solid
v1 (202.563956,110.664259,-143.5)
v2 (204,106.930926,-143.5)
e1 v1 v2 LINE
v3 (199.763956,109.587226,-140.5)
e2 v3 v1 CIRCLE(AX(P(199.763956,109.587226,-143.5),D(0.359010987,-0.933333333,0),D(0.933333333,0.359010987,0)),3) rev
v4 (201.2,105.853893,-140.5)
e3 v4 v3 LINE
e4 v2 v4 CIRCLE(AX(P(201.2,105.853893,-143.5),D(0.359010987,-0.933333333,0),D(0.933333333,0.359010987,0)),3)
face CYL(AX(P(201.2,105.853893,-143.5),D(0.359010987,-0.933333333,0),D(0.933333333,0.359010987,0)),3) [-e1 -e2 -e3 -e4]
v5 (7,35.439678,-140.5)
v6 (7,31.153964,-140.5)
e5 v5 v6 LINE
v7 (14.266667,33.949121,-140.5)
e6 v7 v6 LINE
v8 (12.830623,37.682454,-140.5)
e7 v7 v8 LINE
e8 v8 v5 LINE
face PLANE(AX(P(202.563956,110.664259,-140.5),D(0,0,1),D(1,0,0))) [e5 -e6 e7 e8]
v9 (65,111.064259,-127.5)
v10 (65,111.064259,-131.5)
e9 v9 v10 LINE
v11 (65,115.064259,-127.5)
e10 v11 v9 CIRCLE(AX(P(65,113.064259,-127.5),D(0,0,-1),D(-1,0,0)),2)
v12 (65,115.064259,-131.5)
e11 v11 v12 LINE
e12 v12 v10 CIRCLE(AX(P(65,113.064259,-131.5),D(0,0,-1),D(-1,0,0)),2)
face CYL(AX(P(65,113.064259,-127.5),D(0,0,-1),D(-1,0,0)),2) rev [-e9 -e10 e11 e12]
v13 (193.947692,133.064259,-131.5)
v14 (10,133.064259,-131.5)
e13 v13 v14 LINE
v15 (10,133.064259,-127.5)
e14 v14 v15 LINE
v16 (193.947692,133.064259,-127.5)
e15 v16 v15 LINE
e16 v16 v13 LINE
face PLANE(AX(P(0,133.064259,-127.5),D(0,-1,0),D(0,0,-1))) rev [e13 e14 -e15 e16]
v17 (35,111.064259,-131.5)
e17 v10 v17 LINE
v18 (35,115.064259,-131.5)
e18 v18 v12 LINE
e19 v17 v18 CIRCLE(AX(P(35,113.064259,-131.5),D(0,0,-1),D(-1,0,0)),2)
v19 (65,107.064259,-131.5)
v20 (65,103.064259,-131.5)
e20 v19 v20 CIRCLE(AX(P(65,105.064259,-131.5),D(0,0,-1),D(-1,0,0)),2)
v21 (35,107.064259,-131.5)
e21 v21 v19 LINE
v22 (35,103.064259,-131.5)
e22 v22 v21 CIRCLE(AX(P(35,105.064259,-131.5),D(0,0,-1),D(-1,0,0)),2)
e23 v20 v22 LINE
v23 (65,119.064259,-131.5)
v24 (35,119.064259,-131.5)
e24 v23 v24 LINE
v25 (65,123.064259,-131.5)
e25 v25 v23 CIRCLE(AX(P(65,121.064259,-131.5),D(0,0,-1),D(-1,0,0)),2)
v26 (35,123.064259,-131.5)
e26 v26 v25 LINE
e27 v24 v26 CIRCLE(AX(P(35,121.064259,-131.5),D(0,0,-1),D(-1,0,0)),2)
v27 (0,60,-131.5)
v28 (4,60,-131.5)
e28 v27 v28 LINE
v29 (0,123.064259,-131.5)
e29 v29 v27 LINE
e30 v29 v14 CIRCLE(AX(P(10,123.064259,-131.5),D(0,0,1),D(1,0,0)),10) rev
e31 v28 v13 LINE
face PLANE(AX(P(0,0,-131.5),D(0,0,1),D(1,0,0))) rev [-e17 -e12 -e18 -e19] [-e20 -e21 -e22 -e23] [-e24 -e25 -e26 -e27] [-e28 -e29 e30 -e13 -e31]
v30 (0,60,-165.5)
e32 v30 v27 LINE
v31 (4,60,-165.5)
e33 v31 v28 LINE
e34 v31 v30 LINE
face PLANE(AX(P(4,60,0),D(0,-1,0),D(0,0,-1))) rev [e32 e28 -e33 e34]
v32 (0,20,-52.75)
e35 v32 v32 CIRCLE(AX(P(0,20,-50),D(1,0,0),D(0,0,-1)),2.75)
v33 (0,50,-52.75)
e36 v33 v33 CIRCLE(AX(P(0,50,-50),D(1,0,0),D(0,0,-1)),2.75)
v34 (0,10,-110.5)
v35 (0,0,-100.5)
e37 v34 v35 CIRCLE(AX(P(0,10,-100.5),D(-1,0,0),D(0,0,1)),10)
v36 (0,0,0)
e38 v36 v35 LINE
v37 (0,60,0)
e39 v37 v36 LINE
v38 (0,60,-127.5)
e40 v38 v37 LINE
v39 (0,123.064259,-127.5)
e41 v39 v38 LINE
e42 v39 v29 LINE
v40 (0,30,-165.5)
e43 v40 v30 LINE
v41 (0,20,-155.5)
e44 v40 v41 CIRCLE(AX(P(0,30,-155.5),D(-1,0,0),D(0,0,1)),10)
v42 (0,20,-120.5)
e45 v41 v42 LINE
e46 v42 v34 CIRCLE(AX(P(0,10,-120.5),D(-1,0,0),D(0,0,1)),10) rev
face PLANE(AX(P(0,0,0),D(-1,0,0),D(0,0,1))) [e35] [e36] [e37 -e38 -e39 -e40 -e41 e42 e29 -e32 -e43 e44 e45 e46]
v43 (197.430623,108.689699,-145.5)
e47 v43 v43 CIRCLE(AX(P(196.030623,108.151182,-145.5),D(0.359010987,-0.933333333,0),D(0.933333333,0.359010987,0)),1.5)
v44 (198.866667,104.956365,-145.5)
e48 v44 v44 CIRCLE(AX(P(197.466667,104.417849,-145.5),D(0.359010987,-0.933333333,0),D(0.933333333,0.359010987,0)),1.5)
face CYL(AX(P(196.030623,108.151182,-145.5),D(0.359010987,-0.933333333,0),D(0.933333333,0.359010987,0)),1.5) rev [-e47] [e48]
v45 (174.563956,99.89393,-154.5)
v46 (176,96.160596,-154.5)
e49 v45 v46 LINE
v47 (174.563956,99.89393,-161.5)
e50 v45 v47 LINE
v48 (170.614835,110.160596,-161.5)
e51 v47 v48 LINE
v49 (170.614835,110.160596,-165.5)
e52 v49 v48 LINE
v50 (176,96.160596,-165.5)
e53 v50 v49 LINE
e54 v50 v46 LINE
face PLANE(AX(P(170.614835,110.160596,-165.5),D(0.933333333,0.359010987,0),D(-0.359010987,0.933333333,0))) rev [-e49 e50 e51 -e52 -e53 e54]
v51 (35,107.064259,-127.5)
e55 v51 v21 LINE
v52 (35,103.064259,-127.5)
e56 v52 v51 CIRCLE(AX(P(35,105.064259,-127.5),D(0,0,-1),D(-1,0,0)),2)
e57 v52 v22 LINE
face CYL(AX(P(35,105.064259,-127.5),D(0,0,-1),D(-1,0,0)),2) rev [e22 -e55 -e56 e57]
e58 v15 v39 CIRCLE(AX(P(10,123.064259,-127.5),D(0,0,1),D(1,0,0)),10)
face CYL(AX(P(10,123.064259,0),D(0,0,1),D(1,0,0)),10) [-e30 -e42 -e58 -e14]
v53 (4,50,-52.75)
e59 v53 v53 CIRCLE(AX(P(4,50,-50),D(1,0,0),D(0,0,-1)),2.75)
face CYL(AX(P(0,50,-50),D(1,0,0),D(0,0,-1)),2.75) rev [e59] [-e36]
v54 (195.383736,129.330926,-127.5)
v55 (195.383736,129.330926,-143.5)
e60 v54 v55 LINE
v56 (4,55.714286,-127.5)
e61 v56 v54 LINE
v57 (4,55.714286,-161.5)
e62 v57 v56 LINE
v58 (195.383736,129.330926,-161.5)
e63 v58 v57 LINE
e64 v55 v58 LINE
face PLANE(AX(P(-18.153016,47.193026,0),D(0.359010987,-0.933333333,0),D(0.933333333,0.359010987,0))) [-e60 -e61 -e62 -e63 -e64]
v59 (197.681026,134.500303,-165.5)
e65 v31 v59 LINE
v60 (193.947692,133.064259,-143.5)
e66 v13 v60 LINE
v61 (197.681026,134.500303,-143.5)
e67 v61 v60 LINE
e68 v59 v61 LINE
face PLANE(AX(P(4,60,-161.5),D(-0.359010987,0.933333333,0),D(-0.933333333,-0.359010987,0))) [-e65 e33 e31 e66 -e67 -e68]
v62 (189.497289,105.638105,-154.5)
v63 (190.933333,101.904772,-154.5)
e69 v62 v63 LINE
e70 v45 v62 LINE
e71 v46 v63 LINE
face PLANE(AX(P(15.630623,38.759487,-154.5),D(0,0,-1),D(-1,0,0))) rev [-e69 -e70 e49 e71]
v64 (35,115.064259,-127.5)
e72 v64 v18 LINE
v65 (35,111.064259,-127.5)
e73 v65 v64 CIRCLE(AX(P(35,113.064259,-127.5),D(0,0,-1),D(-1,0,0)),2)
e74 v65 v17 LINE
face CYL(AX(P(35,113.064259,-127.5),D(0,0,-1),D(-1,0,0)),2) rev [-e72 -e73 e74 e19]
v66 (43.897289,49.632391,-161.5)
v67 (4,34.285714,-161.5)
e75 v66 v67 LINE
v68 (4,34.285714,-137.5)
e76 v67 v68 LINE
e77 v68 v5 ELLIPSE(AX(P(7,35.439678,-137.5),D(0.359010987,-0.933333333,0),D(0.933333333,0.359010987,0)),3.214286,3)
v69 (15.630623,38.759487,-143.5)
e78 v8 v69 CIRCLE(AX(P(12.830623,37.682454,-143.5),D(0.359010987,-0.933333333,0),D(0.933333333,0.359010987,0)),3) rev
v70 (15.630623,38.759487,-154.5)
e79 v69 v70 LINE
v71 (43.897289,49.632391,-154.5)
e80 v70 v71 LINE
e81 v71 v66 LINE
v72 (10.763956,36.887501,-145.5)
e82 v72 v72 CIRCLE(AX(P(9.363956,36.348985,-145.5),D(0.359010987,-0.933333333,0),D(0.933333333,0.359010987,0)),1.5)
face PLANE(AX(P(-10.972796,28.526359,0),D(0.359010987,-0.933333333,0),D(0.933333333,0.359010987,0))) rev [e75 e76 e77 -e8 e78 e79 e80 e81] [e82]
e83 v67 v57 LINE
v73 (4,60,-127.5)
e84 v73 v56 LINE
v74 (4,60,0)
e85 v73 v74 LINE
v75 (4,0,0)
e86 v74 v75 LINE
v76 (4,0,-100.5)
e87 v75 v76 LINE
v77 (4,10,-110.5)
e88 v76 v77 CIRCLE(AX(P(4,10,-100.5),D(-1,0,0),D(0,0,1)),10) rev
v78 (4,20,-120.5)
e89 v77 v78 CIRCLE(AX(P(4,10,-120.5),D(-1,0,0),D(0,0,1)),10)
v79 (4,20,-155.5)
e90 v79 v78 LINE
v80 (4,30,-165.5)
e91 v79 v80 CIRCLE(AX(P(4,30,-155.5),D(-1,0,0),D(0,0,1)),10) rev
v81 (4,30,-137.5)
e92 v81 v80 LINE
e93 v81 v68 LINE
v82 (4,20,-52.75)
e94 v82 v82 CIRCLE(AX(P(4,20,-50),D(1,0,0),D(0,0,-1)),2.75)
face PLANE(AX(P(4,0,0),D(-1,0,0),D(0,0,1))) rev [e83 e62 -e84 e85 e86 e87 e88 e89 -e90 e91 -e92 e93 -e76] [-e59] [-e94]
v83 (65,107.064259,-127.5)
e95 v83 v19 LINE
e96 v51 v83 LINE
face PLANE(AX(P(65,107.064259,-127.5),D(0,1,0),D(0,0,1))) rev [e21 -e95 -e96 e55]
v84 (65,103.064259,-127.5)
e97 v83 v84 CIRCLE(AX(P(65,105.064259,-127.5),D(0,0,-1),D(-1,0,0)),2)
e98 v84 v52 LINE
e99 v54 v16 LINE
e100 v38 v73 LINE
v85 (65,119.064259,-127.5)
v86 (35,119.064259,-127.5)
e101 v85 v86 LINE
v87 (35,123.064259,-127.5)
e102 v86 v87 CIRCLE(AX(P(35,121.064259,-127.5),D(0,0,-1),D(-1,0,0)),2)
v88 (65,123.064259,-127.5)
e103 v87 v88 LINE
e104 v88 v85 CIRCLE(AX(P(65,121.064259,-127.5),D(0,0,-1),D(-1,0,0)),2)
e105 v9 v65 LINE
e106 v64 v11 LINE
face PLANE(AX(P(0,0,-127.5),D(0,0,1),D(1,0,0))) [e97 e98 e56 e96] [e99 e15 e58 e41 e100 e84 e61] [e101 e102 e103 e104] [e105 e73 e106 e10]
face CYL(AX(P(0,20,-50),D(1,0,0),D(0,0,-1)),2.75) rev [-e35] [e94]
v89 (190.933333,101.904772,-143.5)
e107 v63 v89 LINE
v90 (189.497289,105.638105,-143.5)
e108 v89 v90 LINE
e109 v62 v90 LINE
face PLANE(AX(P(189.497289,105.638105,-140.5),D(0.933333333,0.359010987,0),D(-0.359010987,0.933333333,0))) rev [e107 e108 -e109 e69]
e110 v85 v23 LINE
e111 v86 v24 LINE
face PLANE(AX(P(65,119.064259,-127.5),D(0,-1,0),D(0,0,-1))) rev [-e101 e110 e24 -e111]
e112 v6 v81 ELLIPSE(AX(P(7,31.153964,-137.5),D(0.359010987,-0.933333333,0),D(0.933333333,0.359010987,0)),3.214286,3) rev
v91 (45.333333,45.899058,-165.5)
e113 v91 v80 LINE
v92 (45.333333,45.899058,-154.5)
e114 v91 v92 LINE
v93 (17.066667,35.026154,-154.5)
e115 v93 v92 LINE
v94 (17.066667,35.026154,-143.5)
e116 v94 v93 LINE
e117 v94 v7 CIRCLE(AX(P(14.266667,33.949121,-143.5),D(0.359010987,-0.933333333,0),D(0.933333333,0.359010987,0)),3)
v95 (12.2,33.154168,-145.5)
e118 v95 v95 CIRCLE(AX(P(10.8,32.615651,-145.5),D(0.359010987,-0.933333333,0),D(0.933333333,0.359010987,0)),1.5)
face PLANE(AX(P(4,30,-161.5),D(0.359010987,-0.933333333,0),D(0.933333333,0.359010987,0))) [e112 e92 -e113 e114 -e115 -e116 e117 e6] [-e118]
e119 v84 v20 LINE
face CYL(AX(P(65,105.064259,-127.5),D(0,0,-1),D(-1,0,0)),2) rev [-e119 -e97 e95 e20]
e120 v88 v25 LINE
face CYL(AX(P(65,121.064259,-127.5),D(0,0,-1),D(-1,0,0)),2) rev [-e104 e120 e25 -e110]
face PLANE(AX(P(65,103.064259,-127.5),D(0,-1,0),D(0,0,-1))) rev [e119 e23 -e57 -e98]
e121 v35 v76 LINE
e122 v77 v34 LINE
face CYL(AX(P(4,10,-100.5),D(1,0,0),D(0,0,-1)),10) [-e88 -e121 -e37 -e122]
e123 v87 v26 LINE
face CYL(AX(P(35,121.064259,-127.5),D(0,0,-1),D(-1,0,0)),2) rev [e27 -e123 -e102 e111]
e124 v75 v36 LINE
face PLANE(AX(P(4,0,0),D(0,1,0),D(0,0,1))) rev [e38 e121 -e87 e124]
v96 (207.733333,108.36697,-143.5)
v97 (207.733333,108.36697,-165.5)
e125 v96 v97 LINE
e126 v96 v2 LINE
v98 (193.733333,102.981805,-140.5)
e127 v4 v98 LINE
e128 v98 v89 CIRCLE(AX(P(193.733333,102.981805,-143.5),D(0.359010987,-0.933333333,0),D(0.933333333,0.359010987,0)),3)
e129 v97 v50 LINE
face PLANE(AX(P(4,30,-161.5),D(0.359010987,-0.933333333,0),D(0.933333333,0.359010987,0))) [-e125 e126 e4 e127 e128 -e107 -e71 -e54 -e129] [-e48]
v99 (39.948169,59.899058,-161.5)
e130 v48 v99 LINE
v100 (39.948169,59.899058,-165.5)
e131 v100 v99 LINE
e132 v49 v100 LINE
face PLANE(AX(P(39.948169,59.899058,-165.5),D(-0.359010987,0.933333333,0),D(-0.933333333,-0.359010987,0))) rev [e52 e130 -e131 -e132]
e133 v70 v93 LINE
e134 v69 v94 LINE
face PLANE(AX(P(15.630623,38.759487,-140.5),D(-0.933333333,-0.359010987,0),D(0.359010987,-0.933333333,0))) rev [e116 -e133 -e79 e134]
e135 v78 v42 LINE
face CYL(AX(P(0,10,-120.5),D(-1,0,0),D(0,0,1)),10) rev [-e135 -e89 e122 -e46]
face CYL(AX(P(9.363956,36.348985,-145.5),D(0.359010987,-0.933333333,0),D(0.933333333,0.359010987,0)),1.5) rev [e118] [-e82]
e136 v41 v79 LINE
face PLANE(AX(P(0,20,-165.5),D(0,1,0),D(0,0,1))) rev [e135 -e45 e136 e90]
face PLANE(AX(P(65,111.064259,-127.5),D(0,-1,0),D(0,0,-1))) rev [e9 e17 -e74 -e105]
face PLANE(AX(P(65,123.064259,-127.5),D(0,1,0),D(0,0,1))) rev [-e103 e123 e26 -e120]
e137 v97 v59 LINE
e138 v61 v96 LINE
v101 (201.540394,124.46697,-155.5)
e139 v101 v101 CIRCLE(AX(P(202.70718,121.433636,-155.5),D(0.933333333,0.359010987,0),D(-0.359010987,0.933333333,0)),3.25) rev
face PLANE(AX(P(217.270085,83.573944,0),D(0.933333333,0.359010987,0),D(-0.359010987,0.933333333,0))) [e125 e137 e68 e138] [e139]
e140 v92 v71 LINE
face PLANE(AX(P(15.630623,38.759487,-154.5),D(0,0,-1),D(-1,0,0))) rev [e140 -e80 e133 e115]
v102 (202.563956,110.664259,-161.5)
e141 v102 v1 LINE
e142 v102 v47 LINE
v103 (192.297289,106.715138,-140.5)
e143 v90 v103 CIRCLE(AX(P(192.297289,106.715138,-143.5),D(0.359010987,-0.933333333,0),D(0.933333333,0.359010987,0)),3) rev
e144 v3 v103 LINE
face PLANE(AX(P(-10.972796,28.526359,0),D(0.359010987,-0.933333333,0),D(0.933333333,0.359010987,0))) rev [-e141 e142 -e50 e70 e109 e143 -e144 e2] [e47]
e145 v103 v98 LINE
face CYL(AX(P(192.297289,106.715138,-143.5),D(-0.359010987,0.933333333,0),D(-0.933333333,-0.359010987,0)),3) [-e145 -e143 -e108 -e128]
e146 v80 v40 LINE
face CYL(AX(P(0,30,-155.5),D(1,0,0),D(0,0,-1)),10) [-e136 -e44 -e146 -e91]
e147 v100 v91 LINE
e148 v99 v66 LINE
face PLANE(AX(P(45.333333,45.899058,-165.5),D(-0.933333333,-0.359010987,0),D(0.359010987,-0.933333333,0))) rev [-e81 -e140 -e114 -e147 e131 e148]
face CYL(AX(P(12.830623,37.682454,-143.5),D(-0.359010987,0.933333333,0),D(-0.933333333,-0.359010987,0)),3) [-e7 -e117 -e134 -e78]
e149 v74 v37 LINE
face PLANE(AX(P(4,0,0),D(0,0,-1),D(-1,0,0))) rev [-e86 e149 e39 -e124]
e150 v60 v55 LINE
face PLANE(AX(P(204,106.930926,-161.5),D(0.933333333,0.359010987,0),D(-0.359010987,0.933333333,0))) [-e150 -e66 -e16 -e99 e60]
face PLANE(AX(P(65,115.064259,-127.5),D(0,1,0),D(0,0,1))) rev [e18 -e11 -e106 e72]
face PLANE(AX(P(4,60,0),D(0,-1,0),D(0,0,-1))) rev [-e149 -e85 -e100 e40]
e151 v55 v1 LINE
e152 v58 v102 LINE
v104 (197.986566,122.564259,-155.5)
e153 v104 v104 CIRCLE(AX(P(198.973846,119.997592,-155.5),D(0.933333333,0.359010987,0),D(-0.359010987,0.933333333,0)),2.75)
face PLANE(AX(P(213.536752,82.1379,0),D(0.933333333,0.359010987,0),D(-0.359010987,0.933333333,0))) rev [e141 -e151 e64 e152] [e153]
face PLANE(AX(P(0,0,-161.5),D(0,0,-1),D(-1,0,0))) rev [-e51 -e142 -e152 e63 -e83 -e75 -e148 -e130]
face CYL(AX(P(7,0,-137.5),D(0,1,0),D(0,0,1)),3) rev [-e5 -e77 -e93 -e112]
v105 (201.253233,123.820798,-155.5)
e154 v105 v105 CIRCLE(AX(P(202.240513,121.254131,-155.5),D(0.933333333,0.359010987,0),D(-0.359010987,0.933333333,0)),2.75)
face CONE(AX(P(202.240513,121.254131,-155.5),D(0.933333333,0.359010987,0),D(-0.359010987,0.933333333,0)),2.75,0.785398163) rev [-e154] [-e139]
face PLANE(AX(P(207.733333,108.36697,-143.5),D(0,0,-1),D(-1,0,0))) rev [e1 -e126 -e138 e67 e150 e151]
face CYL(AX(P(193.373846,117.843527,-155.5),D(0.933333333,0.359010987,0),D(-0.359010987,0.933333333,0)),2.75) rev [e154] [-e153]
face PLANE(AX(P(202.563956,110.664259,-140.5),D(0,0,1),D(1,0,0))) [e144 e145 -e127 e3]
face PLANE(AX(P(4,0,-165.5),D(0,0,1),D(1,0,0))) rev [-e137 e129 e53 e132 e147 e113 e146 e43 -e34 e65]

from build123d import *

# Parameters (mm, degrees)
SKETCH_1_W          = 165.5
SKETCH_1_H          = 60
EXTRUDE_1_DEPTH     = 4
EXTRUDE_2_DEPTH     = 4
SKETCH_3_W          = 214.285714285
SKETCH_3_H          = 25
EXTRUDE_5_DEPTH     = 4
SKETCH_4_R          = 2.75
CUT_EXTRUDE_1_DEPTH = 4
SKETCH_5_W          = 55
SKETCH_5_H          = 20
CUT_EXTRUDE_2_DEPTH = 4
FILLET_1_R          = 10
SKETCH_6_W          = 186.285714285
SKETCH_6_H          = 14
CUT_EXTRUDE_3_DEPTH = 4
SKETCH_7_R          = 1.5
CUT_EXTRUDE_4_DEPTH = 4
FILLET_2_R          = 3
CUT_EXTRUDE_5_DEPTH = 293.240221501
CUT_EXTRUDE_6_DEPTH = 10
SKETCH_11_W         = 207.248718004
SKETCH_11_H         = 34
EXTRUDE_6_DEPTH     = 4
EXTRUDE_7_DEPTH     = 4
FILLET_3_R          = 10
CUT_EXTRUDE_7_DEPTH = 4
SKETCH_15_W         = 22
SKETCH_15_H         = 28
EXTRUDE_8_DEPTH     = 4
SKETCH_16_R         = 2.75
CUT_EXTRUDE_8_DEPTH = 10
CHAMFER_1_SIZE      = 0.5


with BuildPart() as part:
    # 草图1 → 凸台-拉伸1 (new body)
    with BuildSketch(Plane(origin=(0, 0, 0), x_dir=(0, 0, -1), z_dir=(1, 0, 0))):
        with Locations((82.75, 30)):
            Rectangle(SKETCH_1_W, SKETCH_1_H)
    extrude(amount=EXTRUDE_1_DEPTH)

    # 草图2 → 凸台-拉伸2 (add)
    with BuildSketch(Plane(origin=(0, 0, -165.5), x_dir=(-1, 0, 0), z_dir=(0, 0, -1))):
        Polygon((-4, 30), (-204, 106.930925816), (-193.94769236, 133.06425915), (-4, 60), align=None)
    extrude(amount=-EXTRUDE_2_DEPTH)

    # 草图3 → 凸台-拉伸5 (add)
    with BuildSketch(Plane(origin=(-9.536752084, 24.793025648, 0), x_dir=(0.9333333333333335, 0.3590109871422999, 0), z_dir=(0.3590109871422999, -0.9333333333333335, 0))):
        with Locations((121.646520091, -153)):
            Rectangle(SKETCH_3_W, SKETCH_3_H)
    extrude(amount=-EXTRUDE_5_DEPTH)

    # 草图4 → 切除-拉伸1 (cut)
    with BuildSketch(Plane(origin=(4, 0, 0), x_dir=(0, 0, -1), z_dir=(1, 0, 0))):
        with Locations((50, 50)):
            Circle(SKETCH_4_R)
        with Locations((50, 20)):
            Circle(SKETCH_4_R)
    extrude(amount=-CUT_EXTRUDE_1_DEPTH, mode=Mode.SUBTRACT)

    # 草图5 → 切除-拉伸2 (cut)
    with BuildSketch(Plane(origin=(4, 0, 0), x_dir=(0, 0, -1), z_dir=(1, 0, 0))):
        with Locations((138, 10)):
            Rectangle(SKETCH_5_W, SKETCH_5_H)
    extrude(amount=-CUT_EXTRUDE_2_DEPTH, mode=Mode.SUBTRACT)

    # 圆角1
    fillet_1_edges = [part.edges().sort_by_distance(p)[0] for p in [
        (2, 20, -165.5),
        (2, 20, -110.5),
        (2, 0, -110.5),
    ]]
    fillet(fillet_1_edges, radius=FILLET_1_R - 0.0001)  # a hair under: the kernel refuses the full size

    # 草图6 → 切除-拉伸3 (cut)
    with BuildSketch(Plane(origin=(-9.536752084, 24.793025648, 0), x_dir=(0.9333333333333335, 0.35901098714229984, 0), z_dir=(0.35901098714229984, -0.9333333333333335, 0))):
        with Locations((121.646520091, -147.5)):
            Rectangle(SKETCH_6_W, SKETCH_6_H)
    extrude(amount=-CUT_EXTRUDE_3_DEPTH, mode=Mode.SUBTRACT)

    # 草图7 → 切除-拉伸4 (cut)
    with BuildSketch(Plane(origin=(-9.536752084, 24.793025648, 0), x_dir=(0.9333333333333335, 0.35901098714229984, 0), z_dir=(0.35901098714229984, -0.9333333333333335, 0))):
        with Locations((221.789377233, -145.5)):
            Circle(SKETCH_7_R)
        with Locations((21.789377233, -145.5)):
            Circle(SKETCH_7_R)
    extrude(amount=-CUT_EXTRUDE_4_DEPTH, mode=Mode.SUBTRACT)

    # 圆角2
    fillet_2_edges = [part.edges().sort_by_distance(p)[0] for p in [
        (4, 32.142857143, -140.5),
        (203.281978026, 108.797592483, -140.5),
        (16.348644692, 36.892820487, -140.5),
        (190.215311359, 103.771438663, -140.5),
    ]]
    fillet(fillet_2_edges, radius=FILLET_2_R)

    # 草图8 → 切除-拉伸5 (cut, through all)
    with BuildSketch(Plane.XY.offset(-161.5)):
        Polygon((45.333333333, 45.899058002), (39.948168526, 59.899058002), (170.614835193, 110.160596202), (176, 96.160596202), align=None)
    extrude(amount=-CUT_EXTRUDE_5_DEPTH, mode=Mode.SUBTRACT)

    # 草图9 → 切除-拉伸6 (cut)
    with BuildSketch(Plane(origin=(0, 0, -161.5), x_dir=(-1, 0, 0), z_dir=(0, 0, -1))):
        Polygon((-43.897289385, 49.632391335), (-174.563956051, 99.893929535), (-176, 96.160596202), (-45.333333333, 45.899058002), align=None)
    extrude(amount=-CUT_EXTRUDE_6_DEPTH, mode=Mode.SUBTRACT)

    # 草图11 → 凸台-拉伸6 (add)
    with BuildSketch(Plane(origin=(-19.589059724, 50.926358981, 0), x_dir=(0.9333333333333335, 0.3590109871422999, 0), z_dir=(-0.3590109871422999, 0.9333333333333335, 0))):
        with Locations((125.165018231, 148.5)):
            Rectangle(SKETCH_11_W, SKETCH_11_H)
    extrude(amount=-EXTRUDE_6_DEPTH)

    # 草图12 → 凸台-拉伸7 (add)
    with BuildSketch(Plane.XY.offset(-131.5)):
        Polygon((4, 55.714285714), (4, 60), (0, 60), (0, 133.06425915), (193.94769236, 133.06425915), (195.383736309, 129.330925816), align=None)
    extrude(amount=EXTRUDE_7_DEPTH)

    # 圆角3
    fillet_3_edges = [part.edges().sort_by_distance(p)[0] for p in [
        (0, 133.06425915, -129.5),
    ]]
    fillet(fillet_3_edges, radius=FILLET_3_R)

    # 草图14 → 切除-拉伸7 (cut)
    with BuildSketch(Plane(origin=(0, 0, -131.5), x_dir=(-1, 0, 0), z_dir=(0, 0, -1))):
        with BuildLine():
            Line((-65, 123.06425915), (-35, 123.06425915))
            ThreePointArc((-35, 123.06425915), (-33, 121.06425915), (-35, 119.06425915))
            Line((-35, 119.06425915), (-65, 119.06425915))
            ThreePointArc((-65, 119.06425915), (-67, 121.06425915), (-65, 123.06425915))
        make_face()
        with BuildLine():
            Line((-65, 115.06425915), (-35, 115.06425915))
            ThreePointArc((-35, 115.06425915), (-33, 113.06425915), (-35, 111.06425915))
            Line((-35, 111.06425915), (-65, 111.06425915))
            ThreePointArc((-65, 111.06425915), (-67, 113.06425915), (-65, 115.06425915))
        make_face()
        with BuildLine():
            Line((-65, 107.06425915), (-35, 107.06425915))
            ThreePointArc((-35, 107.06425915), (-33, 105.06425915), (-35, 103.06425915))
            Line((-35, 103.06425915), (-65, 103.06425915))
            ThreePointArc((-65, 103.06425915), (-67, 105.06425915), (-65, 107.06425915))
        make_face()
    extrude(amount=-CUT_EXTRUDE_7_DEPTH, mode=Mode.SUBTRACT)

    # 草图15 → 凸台-拉伸8 (add)
    with BuildSketch(Plane(origin=(213.536752084, 82.137900168, 0), x_dir=(0, 0, -1), z_dir=(0.9333333333333338, 0.35901098714229945, 0))):
        with Locations((154.5, 40.563956051)):
            Rectangle(SKETCH_15_W, SKETCH_15_H)
    extrude(amount=EXTRUDE_8_DEPTH)

    # 草图16 → 切除-拉伸8 (cut)
    with BuildSketch(Plane(origin=(217.270085418, 83.573944117, 0), x_dir=(0, 0, -1), z_dir=(0.9333333333333335, 0.35901098714229984, 0))):
        with Locations(Location((155.5, 40.563956051, 0), (0, 0, 90))):
            Circle(SKETCH_16_R)
    extrude(amount=-CUT_EXTRUDE_8_DEPTH, mode=Mode.SUBTRACT)

    # 倒角1
    chamfer_1_edges = [part.edges().sort_by_distance(p)[0] for p in [
        (203.694459728, 118.866969765, -155.5),
    ]]
    chamfer(chamfer_1_edges, length=CHAMFER_1_SIZE)


solid = part.part
